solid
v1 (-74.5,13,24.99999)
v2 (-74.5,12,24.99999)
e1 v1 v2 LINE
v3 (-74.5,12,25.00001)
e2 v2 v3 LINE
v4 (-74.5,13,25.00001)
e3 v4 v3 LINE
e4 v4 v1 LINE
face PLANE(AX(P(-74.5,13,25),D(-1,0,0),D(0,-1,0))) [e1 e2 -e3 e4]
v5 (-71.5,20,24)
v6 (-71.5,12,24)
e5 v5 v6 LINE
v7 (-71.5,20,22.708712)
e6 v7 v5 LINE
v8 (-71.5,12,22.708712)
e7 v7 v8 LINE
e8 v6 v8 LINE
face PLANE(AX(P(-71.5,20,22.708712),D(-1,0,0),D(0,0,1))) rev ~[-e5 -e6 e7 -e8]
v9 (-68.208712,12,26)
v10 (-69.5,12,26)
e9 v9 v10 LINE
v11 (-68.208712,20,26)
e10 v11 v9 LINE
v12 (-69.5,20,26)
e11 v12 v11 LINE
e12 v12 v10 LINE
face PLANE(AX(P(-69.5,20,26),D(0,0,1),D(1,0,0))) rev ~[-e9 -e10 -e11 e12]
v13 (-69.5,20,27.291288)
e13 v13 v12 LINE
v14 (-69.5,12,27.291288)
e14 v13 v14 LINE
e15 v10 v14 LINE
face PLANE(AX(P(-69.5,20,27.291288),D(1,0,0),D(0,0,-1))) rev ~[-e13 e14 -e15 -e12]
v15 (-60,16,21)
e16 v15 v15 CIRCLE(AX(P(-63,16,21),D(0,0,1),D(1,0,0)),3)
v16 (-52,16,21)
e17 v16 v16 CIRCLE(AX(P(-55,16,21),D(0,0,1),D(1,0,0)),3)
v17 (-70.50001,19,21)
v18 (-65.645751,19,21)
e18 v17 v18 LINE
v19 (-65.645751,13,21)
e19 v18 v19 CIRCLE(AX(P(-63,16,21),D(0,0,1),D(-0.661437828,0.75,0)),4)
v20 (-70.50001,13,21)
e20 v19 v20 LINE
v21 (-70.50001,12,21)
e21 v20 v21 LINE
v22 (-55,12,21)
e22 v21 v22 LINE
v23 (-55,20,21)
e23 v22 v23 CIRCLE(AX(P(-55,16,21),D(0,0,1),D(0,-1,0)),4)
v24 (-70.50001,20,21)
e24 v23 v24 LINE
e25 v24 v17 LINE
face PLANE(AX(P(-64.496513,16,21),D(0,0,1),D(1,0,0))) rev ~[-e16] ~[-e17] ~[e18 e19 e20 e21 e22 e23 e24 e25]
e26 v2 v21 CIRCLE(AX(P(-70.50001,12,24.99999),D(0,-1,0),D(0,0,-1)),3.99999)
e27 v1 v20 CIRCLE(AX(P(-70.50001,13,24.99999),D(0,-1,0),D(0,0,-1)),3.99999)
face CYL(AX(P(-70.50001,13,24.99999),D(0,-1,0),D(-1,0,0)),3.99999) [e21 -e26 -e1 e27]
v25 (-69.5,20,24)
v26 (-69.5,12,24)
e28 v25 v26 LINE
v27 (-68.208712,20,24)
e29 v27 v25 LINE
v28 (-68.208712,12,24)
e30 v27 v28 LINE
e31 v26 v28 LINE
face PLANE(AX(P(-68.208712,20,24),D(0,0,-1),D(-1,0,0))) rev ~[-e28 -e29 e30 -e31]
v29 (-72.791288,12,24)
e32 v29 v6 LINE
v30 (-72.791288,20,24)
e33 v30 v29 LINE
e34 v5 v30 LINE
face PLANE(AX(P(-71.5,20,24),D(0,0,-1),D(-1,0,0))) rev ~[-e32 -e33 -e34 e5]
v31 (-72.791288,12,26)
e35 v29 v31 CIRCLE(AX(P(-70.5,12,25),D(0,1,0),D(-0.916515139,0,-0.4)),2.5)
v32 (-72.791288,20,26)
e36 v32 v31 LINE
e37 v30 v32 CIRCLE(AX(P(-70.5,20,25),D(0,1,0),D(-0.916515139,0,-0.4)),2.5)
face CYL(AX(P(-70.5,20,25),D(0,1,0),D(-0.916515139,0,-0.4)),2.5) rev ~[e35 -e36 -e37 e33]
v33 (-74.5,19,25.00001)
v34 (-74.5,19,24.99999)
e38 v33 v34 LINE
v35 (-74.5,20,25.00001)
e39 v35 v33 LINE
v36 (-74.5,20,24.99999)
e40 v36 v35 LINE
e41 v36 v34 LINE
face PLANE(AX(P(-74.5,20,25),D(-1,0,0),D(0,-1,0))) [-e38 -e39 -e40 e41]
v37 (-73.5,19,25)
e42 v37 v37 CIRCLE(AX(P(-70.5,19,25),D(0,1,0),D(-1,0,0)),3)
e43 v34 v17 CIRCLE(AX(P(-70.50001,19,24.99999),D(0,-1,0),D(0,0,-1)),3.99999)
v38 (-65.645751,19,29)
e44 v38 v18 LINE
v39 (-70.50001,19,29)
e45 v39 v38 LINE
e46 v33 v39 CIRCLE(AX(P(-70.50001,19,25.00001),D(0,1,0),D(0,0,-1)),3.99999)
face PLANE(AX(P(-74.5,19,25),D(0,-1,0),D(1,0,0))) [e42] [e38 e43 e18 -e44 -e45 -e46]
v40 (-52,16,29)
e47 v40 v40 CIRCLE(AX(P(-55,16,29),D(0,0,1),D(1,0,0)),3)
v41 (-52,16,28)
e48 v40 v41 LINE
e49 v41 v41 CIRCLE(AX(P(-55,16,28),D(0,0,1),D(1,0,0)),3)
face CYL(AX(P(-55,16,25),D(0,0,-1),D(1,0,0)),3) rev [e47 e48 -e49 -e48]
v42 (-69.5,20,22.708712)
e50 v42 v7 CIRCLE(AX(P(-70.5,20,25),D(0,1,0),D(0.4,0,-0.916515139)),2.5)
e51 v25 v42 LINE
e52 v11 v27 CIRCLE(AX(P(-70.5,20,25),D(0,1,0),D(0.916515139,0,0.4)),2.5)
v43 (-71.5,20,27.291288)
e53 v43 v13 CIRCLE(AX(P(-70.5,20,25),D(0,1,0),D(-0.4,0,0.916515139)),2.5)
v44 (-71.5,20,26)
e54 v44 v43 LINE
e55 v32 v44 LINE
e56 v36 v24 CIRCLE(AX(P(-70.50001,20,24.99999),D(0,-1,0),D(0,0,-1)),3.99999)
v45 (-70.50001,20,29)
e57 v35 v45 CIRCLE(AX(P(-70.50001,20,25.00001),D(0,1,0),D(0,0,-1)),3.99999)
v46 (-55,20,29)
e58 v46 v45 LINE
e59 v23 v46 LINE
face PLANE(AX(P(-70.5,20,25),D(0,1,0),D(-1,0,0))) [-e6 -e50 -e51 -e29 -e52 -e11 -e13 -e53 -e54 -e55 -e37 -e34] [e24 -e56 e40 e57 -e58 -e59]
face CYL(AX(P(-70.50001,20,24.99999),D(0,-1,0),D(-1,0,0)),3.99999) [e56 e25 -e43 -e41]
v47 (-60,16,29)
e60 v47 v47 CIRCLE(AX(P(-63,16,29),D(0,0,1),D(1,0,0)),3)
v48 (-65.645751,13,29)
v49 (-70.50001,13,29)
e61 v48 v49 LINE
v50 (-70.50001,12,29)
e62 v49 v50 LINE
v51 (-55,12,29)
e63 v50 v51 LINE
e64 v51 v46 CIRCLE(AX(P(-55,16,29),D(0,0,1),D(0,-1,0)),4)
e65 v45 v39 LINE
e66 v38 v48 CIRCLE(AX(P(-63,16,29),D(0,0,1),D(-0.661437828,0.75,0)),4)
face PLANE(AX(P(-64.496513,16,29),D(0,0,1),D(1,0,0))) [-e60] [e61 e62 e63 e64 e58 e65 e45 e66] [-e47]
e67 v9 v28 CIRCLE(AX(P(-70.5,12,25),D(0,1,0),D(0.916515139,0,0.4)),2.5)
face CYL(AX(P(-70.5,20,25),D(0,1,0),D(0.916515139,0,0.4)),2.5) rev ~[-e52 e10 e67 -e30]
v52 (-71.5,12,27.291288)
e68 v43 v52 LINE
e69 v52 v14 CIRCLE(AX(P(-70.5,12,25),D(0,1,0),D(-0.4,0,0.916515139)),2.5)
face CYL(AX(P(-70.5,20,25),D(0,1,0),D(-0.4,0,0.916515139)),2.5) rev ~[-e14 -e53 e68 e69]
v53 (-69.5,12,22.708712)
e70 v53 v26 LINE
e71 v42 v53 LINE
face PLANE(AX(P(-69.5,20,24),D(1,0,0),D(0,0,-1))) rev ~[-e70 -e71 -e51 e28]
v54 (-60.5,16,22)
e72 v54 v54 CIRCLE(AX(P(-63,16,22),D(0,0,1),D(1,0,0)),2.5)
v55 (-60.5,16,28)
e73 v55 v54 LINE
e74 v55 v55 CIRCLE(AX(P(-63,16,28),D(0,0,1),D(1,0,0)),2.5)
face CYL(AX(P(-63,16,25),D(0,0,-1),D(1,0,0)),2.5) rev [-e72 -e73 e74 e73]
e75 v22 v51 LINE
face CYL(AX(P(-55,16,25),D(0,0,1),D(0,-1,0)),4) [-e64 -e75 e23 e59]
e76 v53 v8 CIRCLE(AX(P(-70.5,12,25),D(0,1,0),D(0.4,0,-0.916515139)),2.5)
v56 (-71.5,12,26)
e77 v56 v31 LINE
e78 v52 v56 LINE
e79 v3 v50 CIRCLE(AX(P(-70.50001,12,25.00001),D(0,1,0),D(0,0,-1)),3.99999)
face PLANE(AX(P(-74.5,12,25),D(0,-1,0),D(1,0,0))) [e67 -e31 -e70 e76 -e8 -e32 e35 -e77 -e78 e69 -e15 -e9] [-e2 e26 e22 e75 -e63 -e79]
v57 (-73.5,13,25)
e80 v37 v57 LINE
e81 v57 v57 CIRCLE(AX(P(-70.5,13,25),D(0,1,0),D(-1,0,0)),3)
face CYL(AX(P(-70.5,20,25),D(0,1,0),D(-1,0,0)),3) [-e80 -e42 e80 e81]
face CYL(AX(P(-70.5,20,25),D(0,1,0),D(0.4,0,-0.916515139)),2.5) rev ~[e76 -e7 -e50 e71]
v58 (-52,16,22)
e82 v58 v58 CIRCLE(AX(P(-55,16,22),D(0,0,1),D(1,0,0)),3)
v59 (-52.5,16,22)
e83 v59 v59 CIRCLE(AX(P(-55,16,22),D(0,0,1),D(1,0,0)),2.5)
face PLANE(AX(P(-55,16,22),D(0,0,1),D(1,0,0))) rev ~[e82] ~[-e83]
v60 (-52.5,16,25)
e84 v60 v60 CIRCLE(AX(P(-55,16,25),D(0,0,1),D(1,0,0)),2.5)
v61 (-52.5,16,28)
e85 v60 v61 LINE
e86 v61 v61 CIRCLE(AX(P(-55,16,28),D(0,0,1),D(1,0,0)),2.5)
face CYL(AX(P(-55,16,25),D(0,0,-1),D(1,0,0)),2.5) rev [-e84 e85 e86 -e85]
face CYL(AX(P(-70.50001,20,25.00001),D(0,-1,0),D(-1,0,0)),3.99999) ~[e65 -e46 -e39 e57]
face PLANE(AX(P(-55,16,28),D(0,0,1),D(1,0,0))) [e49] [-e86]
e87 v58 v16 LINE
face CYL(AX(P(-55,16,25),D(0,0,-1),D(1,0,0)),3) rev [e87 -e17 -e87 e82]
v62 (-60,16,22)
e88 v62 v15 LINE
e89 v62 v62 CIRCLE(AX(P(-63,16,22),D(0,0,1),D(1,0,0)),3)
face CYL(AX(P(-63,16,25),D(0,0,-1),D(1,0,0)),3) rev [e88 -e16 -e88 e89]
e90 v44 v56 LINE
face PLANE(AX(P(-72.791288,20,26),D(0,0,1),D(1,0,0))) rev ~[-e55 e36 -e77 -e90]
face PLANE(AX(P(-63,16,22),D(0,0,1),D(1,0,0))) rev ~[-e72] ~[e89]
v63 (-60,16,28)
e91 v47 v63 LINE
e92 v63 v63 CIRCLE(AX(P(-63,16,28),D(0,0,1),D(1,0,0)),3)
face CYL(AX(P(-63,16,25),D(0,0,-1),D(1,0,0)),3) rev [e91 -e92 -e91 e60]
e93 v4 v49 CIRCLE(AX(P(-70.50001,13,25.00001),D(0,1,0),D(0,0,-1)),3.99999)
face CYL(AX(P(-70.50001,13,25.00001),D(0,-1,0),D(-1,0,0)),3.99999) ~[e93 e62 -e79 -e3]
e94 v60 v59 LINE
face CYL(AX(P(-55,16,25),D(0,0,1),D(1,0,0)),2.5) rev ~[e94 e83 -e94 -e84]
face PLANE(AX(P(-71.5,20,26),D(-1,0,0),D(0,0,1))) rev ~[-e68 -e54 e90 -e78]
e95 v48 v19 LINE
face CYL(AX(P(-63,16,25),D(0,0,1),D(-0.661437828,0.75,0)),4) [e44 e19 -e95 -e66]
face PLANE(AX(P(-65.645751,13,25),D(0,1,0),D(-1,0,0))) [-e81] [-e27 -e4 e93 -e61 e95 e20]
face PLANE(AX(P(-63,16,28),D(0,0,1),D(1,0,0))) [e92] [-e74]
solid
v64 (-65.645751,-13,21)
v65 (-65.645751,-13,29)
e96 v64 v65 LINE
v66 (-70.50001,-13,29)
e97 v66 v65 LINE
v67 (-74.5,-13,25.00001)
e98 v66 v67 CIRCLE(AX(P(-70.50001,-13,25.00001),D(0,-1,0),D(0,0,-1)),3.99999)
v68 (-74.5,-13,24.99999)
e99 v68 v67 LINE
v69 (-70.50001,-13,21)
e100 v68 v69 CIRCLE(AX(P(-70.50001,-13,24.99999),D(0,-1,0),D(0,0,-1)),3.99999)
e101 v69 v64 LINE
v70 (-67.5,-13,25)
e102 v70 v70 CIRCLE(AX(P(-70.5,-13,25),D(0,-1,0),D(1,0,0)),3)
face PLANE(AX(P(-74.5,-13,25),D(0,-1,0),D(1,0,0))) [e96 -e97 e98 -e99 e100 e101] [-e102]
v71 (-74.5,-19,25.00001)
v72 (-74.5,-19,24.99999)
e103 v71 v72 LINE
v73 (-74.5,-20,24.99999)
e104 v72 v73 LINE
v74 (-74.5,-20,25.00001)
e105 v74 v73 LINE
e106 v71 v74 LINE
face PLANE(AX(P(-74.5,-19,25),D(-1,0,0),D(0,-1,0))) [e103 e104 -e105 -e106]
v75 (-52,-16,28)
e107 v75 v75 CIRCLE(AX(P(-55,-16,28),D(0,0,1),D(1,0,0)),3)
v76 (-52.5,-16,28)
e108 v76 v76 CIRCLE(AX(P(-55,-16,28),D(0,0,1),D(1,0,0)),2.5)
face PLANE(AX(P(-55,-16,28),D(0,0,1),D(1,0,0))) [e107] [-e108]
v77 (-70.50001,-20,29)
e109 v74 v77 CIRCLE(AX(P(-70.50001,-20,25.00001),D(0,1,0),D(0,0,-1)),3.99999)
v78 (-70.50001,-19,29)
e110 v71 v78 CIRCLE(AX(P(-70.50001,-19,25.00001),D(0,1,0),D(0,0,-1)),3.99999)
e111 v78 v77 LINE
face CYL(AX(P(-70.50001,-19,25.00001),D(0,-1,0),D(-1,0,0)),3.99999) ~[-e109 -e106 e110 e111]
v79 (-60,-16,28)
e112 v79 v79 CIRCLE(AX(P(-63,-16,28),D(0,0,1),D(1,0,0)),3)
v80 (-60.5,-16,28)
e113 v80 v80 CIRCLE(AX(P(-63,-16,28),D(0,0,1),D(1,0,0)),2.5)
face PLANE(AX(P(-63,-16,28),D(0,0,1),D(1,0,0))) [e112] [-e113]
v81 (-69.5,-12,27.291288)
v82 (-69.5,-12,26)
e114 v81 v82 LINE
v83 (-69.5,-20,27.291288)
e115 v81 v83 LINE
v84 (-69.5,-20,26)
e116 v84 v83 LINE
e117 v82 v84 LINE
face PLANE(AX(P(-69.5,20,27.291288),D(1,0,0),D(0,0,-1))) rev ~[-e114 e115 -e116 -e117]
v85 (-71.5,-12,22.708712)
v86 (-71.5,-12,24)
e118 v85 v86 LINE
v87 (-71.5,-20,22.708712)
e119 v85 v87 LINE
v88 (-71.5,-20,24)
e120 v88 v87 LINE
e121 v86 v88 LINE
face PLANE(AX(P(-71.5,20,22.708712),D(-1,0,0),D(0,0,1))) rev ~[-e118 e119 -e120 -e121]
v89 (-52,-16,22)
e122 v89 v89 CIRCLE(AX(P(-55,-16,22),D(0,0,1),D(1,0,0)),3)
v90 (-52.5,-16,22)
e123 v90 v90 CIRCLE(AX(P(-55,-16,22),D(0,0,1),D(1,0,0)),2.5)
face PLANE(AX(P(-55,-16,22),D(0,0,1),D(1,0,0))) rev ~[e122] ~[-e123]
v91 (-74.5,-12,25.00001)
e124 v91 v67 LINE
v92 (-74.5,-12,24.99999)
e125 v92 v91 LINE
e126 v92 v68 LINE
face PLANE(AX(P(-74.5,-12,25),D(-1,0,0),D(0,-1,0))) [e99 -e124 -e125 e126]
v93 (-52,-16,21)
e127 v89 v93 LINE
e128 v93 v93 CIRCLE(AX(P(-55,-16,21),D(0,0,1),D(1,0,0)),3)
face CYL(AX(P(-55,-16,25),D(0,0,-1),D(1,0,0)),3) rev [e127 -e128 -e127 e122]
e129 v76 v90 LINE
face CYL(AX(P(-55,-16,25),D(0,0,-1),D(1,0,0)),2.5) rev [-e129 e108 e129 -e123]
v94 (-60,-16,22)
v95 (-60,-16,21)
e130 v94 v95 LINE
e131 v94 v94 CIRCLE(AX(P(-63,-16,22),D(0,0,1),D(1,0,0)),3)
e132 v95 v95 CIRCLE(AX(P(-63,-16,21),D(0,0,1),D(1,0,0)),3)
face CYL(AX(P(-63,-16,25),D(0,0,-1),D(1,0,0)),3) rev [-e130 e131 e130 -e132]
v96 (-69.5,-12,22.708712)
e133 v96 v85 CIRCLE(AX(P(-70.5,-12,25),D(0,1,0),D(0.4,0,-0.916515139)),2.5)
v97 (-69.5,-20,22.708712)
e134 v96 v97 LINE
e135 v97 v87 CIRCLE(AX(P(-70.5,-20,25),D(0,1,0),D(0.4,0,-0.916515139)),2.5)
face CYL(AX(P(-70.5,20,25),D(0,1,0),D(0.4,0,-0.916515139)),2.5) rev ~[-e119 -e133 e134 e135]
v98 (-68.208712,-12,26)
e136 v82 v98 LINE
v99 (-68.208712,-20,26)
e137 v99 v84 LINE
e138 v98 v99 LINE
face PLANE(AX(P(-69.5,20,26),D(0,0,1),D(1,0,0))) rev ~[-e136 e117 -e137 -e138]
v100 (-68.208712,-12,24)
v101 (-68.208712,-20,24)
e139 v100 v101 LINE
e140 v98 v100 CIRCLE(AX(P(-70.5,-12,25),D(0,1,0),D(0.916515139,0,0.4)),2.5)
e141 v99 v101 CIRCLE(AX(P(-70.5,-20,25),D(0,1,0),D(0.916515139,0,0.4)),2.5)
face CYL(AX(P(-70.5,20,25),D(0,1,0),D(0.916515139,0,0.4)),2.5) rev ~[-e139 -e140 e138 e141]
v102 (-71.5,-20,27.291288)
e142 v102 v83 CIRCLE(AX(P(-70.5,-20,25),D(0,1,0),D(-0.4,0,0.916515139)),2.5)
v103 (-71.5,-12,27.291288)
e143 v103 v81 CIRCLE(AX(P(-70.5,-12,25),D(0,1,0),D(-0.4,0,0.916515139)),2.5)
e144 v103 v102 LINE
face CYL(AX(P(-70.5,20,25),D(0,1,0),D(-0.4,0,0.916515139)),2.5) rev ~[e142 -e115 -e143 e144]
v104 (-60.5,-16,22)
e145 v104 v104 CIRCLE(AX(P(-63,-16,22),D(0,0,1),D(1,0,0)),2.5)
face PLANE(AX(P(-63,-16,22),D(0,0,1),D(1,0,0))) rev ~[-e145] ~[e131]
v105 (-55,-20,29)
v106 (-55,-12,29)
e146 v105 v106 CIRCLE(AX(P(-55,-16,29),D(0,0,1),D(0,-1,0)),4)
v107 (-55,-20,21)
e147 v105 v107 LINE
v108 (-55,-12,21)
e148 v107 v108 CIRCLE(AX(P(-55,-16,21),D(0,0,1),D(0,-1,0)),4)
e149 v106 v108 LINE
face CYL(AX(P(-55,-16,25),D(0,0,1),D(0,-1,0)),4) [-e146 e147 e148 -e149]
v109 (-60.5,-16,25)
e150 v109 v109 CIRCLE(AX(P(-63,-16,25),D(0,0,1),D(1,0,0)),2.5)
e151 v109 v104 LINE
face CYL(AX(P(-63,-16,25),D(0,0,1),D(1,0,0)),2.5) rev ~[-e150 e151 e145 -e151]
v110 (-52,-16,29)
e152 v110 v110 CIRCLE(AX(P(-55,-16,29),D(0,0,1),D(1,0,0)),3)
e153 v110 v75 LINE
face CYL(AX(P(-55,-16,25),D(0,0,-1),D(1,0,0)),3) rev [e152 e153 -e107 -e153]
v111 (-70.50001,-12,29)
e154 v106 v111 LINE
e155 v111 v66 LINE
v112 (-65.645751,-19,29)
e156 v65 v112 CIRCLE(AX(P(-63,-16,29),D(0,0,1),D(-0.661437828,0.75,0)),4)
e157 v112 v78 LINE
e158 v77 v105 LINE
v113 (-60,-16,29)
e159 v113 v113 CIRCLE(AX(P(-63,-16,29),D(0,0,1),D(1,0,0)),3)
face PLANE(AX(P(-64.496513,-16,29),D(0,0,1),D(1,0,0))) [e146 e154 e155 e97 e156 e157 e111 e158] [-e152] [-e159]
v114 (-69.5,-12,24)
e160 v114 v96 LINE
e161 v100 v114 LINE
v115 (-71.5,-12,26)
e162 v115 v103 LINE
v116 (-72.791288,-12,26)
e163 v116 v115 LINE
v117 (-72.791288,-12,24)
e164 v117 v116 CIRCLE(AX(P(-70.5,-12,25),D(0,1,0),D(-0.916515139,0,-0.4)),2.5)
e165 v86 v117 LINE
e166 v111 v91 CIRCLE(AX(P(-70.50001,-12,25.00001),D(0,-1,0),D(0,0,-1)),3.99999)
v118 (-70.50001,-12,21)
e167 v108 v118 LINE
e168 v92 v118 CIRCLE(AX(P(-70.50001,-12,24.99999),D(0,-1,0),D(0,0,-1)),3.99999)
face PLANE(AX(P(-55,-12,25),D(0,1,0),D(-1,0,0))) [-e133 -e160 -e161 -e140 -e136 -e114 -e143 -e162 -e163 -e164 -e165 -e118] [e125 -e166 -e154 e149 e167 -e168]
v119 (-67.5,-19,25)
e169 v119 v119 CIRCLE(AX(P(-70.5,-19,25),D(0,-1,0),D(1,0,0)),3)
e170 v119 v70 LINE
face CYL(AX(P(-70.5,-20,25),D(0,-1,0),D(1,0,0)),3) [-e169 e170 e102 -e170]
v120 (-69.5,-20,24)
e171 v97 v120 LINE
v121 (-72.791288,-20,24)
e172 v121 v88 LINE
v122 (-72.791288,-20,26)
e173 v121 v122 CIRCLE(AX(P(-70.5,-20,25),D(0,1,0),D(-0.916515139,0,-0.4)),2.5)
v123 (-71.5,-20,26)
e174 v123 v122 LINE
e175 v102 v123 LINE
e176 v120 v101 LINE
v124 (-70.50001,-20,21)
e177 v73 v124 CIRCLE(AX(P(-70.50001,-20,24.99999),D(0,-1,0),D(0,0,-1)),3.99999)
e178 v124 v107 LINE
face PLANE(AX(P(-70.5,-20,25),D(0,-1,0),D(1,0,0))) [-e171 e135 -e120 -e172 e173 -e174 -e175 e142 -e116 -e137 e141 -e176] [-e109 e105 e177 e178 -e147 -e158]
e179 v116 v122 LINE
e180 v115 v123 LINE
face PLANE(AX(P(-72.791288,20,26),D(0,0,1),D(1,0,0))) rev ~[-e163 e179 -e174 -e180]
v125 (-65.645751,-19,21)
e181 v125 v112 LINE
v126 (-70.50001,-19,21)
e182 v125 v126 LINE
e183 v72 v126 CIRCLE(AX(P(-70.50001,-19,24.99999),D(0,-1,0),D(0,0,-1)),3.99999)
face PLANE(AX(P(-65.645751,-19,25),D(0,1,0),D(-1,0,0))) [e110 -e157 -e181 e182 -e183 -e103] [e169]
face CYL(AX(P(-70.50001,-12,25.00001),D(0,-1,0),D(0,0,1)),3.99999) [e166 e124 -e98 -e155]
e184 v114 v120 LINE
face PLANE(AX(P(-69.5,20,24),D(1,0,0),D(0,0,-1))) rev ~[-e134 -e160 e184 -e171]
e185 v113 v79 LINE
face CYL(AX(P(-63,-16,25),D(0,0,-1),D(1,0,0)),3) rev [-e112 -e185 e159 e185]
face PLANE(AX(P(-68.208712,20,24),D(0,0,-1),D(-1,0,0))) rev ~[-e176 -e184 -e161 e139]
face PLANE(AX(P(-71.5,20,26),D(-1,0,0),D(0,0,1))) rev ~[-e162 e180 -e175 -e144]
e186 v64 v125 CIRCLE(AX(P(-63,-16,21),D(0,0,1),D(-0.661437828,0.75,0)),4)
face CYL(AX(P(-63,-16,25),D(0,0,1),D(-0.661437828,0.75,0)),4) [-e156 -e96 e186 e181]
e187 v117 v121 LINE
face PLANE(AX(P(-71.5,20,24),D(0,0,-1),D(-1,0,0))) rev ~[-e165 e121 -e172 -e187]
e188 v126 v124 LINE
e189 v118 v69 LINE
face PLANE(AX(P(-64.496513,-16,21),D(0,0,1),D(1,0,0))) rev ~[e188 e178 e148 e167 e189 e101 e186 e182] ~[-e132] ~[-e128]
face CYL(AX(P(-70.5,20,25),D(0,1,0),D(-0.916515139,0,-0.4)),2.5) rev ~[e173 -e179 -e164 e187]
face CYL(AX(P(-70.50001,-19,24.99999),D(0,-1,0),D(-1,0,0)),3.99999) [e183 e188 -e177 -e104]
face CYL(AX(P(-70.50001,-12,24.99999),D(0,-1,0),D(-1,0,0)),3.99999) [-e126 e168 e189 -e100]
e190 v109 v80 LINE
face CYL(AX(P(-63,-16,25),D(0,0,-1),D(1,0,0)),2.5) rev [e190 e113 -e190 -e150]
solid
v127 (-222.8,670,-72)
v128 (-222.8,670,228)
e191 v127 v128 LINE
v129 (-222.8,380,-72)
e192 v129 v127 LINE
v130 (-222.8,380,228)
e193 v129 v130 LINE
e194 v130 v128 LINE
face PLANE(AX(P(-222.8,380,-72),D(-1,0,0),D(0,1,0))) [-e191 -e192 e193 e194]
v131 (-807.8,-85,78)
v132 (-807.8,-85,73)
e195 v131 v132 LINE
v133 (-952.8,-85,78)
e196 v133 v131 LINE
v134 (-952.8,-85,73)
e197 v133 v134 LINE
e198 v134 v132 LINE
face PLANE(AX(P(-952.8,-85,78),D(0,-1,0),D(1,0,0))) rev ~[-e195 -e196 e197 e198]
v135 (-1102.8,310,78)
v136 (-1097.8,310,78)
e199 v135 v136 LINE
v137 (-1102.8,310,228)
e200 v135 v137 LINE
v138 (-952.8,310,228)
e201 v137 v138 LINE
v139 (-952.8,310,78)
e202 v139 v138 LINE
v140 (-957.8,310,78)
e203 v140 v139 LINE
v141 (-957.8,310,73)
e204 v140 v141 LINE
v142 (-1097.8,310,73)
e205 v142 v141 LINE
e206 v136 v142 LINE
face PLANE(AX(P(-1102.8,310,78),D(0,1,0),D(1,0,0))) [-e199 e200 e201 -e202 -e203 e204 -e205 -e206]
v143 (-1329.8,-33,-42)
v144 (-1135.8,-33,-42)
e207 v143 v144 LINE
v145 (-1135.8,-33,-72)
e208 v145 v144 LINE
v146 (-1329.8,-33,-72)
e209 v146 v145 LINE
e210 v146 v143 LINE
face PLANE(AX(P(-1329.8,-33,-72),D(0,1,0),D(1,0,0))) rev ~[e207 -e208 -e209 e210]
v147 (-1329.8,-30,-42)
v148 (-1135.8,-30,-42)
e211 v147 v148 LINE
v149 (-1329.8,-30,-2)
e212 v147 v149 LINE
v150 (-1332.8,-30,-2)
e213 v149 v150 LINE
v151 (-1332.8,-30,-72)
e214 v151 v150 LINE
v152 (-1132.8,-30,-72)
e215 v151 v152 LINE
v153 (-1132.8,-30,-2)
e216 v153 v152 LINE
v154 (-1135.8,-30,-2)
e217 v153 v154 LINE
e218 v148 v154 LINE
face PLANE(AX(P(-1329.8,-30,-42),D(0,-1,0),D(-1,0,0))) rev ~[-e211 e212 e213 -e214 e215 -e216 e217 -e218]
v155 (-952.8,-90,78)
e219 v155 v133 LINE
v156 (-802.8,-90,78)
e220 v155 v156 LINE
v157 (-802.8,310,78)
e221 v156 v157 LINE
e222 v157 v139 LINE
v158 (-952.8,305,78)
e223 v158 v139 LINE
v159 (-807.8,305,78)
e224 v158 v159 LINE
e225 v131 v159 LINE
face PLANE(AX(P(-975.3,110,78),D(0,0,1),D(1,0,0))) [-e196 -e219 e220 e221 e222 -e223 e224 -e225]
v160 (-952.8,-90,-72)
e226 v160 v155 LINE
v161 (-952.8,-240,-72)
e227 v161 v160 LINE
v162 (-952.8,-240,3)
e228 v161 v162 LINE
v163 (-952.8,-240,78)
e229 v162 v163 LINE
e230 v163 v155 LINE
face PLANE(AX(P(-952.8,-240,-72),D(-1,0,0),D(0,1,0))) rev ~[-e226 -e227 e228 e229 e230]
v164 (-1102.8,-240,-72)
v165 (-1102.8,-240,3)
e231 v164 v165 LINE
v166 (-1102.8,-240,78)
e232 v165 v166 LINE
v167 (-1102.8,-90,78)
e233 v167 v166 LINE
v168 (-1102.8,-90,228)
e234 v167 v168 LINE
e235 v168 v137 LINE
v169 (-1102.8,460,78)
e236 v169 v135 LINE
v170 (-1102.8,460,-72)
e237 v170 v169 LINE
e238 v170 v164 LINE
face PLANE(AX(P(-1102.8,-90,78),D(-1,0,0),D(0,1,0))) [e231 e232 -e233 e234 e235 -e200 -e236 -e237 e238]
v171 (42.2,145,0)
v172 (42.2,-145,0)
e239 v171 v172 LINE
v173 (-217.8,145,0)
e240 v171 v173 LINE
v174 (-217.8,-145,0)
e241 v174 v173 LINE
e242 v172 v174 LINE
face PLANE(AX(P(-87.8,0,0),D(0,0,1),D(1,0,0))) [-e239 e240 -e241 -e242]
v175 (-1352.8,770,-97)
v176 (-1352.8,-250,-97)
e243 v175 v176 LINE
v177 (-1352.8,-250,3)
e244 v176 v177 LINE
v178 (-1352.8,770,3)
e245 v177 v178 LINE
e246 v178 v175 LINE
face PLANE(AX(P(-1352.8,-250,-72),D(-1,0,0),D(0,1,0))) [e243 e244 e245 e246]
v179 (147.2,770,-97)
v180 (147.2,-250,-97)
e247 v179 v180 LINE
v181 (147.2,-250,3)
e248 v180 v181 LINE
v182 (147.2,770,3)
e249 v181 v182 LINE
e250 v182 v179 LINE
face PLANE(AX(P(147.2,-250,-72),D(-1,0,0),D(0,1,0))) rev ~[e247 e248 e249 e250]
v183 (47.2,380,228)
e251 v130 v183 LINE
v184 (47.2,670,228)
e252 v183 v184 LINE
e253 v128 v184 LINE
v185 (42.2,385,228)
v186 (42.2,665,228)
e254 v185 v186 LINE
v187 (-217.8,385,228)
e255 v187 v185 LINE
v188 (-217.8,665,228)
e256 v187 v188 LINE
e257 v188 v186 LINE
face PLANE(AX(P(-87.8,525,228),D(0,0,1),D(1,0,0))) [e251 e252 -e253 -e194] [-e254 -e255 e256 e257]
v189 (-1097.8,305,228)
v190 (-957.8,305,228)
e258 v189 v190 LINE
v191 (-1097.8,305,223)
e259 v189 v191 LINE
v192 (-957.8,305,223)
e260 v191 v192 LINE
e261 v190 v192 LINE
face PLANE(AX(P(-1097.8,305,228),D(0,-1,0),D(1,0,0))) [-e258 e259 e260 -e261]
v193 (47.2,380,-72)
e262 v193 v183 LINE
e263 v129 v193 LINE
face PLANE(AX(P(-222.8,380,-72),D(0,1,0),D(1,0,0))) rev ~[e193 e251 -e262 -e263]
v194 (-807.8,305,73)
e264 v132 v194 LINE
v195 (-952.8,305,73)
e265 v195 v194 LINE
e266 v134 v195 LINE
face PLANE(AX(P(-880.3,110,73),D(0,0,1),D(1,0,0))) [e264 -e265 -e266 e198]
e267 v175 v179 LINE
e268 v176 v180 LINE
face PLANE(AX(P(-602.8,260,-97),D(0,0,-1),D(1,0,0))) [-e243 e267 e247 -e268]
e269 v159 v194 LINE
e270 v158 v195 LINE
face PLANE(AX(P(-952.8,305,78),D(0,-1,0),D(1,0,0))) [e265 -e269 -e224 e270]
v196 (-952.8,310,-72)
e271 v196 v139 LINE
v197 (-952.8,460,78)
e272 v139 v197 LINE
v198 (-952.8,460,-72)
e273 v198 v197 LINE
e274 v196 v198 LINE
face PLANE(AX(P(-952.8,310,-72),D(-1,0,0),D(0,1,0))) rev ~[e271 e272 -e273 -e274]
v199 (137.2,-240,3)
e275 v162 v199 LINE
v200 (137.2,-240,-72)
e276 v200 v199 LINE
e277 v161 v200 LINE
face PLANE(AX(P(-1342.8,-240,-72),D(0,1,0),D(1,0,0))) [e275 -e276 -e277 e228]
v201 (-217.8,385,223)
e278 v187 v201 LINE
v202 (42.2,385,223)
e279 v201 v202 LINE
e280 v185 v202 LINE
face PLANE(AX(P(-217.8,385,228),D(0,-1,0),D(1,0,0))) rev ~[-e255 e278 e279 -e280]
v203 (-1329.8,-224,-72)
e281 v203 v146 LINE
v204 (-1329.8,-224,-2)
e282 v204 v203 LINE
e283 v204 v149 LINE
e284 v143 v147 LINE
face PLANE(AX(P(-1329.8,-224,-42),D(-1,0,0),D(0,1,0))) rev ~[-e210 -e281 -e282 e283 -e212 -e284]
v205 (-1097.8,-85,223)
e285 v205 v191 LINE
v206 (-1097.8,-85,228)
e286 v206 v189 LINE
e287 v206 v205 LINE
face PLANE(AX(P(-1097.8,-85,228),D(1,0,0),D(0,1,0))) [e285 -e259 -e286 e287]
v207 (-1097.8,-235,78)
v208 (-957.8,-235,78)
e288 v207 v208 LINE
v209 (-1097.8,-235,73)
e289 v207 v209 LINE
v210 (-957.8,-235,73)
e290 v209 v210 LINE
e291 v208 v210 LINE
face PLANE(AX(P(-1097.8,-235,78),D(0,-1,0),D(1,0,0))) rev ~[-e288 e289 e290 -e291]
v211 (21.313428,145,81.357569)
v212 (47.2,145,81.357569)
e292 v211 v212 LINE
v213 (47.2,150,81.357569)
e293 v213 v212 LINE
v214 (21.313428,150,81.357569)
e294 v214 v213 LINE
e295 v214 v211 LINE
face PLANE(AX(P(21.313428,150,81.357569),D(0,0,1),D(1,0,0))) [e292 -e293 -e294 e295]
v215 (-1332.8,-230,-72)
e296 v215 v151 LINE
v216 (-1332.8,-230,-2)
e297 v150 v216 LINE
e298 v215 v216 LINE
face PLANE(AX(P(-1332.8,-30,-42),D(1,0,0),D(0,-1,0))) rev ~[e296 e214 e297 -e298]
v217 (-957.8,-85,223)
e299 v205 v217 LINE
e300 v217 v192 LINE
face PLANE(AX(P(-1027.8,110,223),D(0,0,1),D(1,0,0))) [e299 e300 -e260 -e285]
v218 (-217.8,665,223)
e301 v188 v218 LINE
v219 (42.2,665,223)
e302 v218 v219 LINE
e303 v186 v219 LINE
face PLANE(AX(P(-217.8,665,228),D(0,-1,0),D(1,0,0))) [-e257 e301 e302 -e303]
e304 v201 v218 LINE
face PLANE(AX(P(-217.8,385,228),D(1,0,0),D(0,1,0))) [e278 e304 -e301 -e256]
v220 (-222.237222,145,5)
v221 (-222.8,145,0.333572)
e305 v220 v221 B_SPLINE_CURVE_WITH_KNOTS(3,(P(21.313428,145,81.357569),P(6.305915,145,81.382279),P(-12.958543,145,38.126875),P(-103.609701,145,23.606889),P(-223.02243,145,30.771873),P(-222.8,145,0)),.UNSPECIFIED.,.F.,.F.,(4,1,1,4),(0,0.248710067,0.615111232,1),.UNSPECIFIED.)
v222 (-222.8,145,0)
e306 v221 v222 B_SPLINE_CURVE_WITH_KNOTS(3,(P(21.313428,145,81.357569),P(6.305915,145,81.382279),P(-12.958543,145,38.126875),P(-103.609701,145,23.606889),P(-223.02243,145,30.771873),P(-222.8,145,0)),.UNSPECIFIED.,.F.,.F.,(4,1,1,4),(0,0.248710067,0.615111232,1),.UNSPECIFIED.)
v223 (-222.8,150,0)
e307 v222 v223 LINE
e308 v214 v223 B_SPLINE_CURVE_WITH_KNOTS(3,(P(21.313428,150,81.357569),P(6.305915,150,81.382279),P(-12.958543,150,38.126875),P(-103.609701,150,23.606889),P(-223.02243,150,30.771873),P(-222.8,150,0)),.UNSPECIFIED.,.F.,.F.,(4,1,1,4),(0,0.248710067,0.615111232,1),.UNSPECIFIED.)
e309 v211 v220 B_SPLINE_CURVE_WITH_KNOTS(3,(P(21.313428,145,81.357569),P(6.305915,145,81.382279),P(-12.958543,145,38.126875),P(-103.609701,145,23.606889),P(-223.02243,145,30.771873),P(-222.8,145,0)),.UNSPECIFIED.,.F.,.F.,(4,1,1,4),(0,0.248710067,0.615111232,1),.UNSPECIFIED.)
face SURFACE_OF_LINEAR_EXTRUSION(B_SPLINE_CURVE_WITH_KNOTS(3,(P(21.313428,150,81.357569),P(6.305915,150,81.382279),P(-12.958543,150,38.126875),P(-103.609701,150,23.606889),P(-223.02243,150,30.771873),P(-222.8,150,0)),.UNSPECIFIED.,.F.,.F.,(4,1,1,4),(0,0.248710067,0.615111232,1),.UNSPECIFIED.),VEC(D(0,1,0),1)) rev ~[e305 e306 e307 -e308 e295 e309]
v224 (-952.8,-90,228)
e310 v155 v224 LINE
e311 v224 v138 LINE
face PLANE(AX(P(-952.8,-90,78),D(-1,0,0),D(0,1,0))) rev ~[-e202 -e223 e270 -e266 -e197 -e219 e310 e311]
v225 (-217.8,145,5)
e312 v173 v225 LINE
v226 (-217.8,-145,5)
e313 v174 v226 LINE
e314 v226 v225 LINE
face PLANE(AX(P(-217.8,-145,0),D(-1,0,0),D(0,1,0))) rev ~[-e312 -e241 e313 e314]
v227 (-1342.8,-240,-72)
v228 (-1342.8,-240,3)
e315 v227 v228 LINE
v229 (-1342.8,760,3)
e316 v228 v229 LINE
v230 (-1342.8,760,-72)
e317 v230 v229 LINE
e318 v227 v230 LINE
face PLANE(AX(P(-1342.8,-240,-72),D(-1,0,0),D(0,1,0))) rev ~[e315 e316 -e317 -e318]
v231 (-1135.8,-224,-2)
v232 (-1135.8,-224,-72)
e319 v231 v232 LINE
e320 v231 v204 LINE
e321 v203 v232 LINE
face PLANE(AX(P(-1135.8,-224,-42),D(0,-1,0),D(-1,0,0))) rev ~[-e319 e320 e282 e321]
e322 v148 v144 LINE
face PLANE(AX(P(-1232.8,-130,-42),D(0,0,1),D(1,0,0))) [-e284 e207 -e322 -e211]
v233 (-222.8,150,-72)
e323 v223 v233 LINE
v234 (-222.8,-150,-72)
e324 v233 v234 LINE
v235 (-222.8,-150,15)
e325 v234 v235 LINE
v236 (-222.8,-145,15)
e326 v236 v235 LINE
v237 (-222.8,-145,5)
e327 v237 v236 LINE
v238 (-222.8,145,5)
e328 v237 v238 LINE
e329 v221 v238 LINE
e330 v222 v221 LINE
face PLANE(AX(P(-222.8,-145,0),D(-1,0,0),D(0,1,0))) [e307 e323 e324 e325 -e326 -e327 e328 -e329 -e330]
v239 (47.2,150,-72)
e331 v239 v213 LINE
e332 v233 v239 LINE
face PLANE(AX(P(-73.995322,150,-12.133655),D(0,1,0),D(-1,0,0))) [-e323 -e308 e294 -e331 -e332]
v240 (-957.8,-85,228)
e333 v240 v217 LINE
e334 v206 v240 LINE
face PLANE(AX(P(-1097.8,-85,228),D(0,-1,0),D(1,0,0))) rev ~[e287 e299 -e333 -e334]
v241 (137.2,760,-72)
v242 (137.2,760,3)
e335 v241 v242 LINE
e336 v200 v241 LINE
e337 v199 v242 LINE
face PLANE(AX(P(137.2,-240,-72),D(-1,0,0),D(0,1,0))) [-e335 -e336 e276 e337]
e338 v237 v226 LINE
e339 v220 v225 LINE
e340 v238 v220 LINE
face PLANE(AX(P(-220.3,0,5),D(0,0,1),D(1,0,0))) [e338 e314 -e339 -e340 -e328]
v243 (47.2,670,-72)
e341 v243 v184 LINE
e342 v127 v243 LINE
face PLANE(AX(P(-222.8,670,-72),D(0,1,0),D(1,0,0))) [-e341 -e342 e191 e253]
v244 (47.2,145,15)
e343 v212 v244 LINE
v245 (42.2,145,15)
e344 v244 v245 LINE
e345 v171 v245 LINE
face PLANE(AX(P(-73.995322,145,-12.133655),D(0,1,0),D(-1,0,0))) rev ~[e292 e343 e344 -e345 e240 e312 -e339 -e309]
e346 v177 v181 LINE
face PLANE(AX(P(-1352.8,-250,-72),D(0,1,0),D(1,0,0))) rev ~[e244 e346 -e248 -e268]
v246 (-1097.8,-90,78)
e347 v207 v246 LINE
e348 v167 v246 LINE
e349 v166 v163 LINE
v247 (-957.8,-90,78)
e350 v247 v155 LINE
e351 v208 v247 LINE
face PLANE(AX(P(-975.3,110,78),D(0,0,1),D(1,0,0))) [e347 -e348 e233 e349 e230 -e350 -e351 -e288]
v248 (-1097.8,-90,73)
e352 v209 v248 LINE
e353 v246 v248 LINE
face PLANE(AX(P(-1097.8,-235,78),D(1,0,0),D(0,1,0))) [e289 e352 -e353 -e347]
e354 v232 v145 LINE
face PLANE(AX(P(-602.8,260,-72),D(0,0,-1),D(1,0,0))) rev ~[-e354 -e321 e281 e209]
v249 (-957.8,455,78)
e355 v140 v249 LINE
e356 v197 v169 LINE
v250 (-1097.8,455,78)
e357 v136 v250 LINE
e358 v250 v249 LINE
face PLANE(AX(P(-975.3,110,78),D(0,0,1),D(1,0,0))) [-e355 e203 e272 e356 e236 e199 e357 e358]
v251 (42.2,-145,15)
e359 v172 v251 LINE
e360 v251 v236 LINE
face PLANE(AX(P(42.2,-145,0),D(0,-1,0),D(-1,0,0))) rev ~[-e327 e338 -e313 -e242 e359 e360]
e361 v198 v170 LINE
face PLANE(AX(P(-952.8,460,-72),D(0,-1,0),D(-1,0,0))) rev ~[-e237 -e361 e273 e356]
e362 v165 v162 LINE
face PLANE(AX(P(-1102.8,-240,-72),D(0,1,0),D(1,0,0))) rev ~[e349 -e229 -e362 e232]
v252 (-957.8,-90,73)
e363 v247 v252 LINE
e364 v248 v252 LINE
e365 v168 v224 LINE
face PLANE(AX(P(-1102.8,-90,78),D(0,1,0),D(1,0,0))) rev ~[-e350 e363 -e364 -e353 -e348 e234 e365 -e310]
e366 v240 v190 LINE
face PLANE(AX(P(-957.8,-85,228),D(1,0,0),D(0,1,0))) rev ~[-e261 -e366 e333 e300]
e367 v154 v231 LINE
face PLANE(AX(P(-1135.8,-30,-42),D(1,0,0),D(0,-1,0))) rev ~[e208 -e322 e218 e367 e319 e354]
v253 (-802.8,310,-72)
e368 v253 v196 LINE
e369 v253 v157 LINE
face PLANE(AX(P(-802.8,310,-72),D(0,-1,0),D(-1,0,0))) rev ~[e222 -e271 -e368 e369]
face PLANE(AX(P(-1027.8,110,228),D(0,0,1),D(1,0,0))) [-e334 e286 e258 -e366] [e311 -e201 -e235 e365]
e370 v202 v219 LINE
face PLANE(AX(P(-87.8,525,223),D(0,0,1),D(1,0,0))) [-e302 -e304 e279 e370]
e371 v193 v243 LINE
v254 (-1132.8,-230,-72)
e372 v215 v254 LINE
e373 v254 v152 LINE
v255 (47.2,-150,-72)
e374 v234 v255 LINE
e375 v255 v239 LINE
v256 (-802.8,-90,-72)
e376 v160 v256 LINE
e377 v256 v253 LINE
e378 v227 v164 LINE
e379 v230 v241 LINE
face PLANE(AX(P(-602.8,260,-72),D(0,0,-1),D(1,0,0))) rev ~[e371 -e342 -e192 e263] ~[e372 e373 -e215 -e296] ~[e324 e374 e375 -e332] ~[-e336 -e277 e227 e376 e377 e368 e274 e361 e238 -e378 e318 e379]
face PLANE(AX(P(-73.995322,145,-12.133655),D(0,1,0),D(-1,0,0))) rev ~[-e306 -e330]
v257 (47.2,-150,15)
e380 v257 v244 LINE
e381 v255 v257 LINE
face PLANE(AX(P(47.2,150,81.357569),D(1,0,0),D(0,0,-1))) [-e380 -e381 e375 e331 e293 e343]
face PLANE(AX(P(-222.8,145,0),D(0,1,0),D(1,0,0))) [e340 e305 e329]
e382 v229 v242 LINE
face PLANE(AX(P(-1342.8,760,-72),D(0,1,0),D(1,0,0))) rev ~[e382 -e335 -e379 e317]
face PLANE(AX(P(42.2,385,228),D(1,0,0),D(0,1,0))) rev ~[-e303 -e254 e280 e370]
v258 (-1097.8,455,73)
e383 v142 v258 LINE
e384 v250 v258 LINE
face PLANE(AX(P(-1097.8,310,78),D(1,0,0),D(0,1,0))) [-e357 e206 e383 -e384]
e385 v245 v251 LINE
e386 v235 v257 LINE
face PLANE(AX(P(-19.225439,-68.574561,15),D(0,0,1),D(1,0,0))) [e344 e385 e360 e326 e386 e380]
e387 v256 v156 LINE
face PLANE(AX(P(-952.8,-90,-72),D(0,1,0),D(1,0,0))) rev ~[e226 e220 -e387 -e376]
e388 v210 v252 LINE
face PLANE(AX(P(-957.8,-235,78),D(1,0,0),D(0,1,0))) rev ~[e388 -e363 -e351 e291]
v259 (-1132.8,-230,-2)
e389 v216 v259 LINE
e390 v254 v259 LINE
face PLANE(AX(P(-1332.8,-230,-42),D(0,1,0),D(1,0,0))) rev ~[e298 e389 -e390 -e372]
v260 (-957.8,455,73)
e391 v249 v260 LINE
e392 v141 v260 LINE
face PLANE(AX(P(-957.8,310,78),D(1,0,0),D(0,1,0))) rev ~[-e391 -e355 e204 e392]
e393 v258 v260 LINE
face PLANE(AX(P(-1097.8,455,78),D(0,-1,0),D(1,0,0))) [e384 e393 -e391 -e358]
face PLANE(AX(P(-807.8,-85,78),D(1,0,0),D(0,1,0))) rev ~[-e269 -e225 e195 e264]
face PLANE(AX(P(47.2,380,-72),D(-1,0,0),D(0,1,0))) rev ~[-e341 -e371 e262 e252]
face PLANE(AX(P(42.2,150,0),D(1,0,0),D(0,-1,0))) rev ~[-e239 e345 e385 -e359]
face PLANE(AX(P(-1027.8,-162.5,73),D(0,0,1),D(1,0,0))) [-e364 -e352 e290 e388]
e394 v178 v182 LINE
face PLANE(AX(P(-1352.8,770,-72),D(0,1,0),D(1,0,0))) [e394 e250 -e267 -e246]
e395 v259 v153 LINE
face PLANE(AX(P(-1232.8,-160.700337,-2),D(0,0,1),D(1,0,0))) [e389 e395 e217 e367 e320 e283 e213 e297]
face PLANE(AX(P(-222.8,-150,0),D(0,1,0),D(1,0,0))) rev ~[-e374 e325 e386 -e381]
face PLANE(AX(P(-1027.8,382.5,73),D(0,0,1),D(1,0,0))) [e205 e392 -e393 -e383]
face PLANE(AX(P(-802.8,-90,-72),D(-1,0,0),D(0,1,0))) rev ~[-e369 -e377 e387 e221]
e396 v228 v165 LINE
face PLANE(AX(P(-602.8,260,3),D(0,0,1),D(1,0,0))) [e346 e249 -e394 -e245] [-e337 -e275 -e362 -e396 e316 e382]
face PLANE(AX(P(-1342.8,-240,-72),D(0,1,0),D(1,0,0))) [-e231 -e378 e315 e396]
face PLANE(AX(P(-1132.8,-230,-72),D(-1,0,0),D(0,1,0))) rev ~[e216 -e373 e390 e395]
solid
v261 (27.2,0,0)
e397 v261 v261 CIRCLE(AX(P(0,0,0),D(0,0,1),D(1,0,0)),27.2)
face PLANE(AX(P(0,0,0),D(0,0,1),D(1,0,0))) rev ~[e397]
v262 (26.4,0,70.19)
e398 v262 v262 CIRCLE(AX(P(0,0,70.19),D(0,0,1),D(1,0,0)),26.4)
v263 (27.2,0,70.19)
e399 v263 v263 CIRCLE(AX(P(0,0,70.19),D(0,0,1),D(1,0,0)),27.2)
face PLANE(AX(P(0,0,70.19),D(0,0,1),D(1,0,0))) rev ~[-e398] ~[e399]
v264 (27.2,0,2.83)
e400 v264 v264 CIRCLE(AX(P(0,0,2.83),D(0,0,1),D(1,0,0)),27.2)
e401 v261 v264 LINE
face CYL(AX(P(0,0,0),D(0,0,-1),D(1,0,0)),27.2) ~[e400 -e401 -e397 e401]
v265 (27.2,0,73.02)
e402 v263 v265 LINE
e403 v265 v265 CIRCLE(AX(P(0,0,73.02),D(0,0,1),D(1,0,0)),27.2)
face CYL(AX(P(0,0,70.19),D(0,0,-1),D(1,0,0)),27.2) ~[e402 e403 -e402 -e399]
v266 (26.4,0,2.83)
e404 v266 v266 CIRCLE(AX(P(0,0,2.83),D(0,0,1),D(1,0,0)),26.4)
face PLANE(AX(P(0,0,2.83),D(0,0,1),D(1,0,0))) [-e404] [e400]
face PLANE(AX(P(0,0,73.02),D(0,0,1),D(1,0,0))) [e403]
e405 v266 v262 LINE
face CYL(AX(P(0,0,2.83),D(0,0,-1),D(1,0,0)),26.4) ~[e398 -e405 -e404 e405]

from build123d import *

# Parameters (mm, degrees)
F0_R      = 27.2
F1_DEPTH  = 2.83
F2_R      = 26.4
F3_DEPTH  = 67.36
F4_R      = 27.2
F5_DEPTH  = 2.83
F9_W      = 270
F9_H      = 300
F10_DEPTH = 72
F12_DEPTH = 15
F14_DEPTH = 5
F15_W     = 5
F15_H     = 290
F16_DEPTH = 5
F17_W     = 1500
F17_H     = 1020
F18_DEPTH = 25
F19_W     = 270
F19_H     = 290
F20_DEPTH = 300
F21_W     = 260
F21_H     = 280
F22_DEPTH = 5
F23_W     = 1500
F23_H     = 1020
F23_W_2   = 1480
F23_H_2   = 1000
F24_DEPTH = 75
F26_DEPTH = 150
F27_W     = 150
F27_H     = 400
F28_DEPTH = 150
F29_W     = 140
F29_H     = 390
F30_DEPTH = 5
F31_W     = 140
F31_H     = 145
F31_W_2   = 145
F31_H_2   = 390
F32_DEPTH = 5
F33_R     = 3
F34_DEPTH = 4
F35_R     = 3.99999
F35_2_R   = 3.99999
F36_R     = 3
F37_DEPTH = 8
F38_R     = 3
F39_DEPTH = 8
F40_R     = 3
F40_R_2   = 2.5
F41_DEPTH = 3
F42_R     = 3
F42_R_2   = 2.5
F43_DEPTH = 3
F45_DEPTH = 270.001
F46_W     = 200
F46_H     = 200
F46_W_2   = 194
F46_H_2   = 191
F47_DEPTH = 30
F49_DEPTH = 40
F50_R     = 2.5
F51_DEPTH = 8


# Not quite as in the source:
# - a fillet or chamfer is up to 0.001 mm smaller than in the source, because OpenCascade refuses the exact size
# - a feature names something its author has since deleted; it is built from what else it names


with BuildPart() as f1:
    # F0 (on Top) → F1 (new body)
    with BuildSketch(Plane.XY):
        Circle(F0_R)
    extrude(amount=F1_DEPTH)

    # F2 (on face) → F3 (join)
    with BuildSketch(Plane.XY.offset(2.83)):
        Circle(F2_R)
    extrude(amount=F3_DEPTH)

    # F4 (on face) → F5 (join)
    with BuildSketch(Plane.XY.offset(70.19)):
        Circle(F4_R)
    extrude(amount=F5_DEPTH)


with BuildPart() as f10:
    # F9 (on Top) → F10 (new body)
    with BuildSketch(Plane.XY):
        with Locations((-87.8, 0)):
            Rectangle(F9_W, F9_H)
    extrude(amount=-F10_DEPTH)

    # F11 (on face) → F12 (join)
    with BuildSketch(Plane.XY):
        Polygon((-222.8, -145), (-222.8, -150), (47.2, -150), (47.2, 150), (42.2, 150), (42.2, -145), align=None)
    extrude(amount=F12_DEPTH)

    # F13 (on face) → F14 (join)
    with BuildSketch(Plane(origin=(0, 150, 0), x_dir=(-1, 0, 0), z_dir=(0, 1, 0))):
        with BuildLine():
            Line((-21.3134280931, 81.3575685024), (-47.2, 81.3575685024))
            Line((-47.2, 81.3575685024), (-47.2, -72))
            Line((-47.2, -72), (222.8, -72))
            Line((222.8, -72), (222.8, 0))
            add(Edge.make_bspline(
                [(-21.3134280931, 81.3575685024), (-6.3059147253, 81.3822787863), (12.9585432644, 38.1268753575), (103.6097013063, 23.6068887567), (223.0224295336, 30.7718731823), (222.8, 0)],
                knots=[0, 0, 0, 0, 0.2487100673, 0.6151112321, 1, 1, 1, 1], degree=3))
        make_face()
    extrude(amount=-F14_DEPTH)

    # F15 (on face) → F16 (join)
    with BuildSketch(Plane.XY):
        with Locations((-220.3, 0)):
            Rectangle(F15_W, F15_H)
    extrude(amount=F16_DEPTH)

    # F17 (on face) → F18 (join)
    with BuildSketch(Plane(origin=(0, 0, -72), x_dir=(1, 0, 0), z_dir=(0, 0, -1))):
        with Locations((-602.8, -260)):
            Rectangle(F17_W, F17_H)
    extrude(amount=F18_DEPTH)

    # F19 (on face) → F20 (join)
    with BuildSketch(Plane.XY.offset(-72)):
        with Locations((-87.8, 525)):
            Rectangle(F19_W, F19_H)
    extrude(amount=F20_DEPTH)

    # F21 (on face) → F22 (cut)
    with BuildSketch(Plane.XY.offset(228)):
        with Locations((-87.8, 525)):
            Rectangle(F21_W, F21_H)
    extrude(amount=-F22_DEPTH, mode=Mode.SUBTRACT)

    # F23 (on face) → F24 (join)
    with BuildSketch(Plane.XY.offset(-72)):
        with Locations((-602.8, 260)):
            Rectangle(F23_W, F23_H)
        with Locations((-602.8, 260)):
            Rectangle(F23_W_2, F23_H_2, mode=Mode.SUBTRACT)
    extrude(amount=F24_DEPTH)

    # F25 (on face) → F26 (join)
    with BuildSketch(Plane.XY.offset(-72)):
        Polygon((-952.8, 460), (-1102.8, 460), (-1102.8, -240), (-952.8, -240), (-952.8, -90), (-802.8, -90), (-802.8, 310), (-952.8, 310), align=None)
    extrude(amount=F26_DEPTH)

    # F27 (on face) → F28 (join)
    with BuildSketch(Plane.XY.offset(78)):
        with Locations((-1027.8, 110)):
            Rectangle(F27_W, F27_H)
    extrude(amount=F28_DEPTH)

    # F29 (on face) → F30 (cut)
    with BuildSketch(Plane.XY.offset(228)):
        with Locations((-1027.8, 110)):
            Rectangle(F29_W, F29_H)
    extrude(amount=-F30_DEPTH, mode=Mode.SUBTRACT)

    # F31 (on face) → F32 (cut)
    with BuildSketch(Plane.XY.offset(78)):
        with Locations((-1027.8, 382.5)):
            Rectangle(F31_W, F31_H)
        with Locations((-880.3, 110)):
            Rectangle(F31_W_2, F31_H_2)
        with Locations((-1027.8, -162.5)):
            Rectangle(F31_W, F31_H)
    extrude(amount=-F32_DEPTH, mode=Mode.SUBTRACT)

    # F46 (on face) → F47 (join)
    with BuildSketch(Plane.XY.offset(-72)):
        with Locations((-1232.8, -130)):
            Rectangle(F46_W, F46_H)
        with Locations((-1232.8, -128.5)):
            Rectangle(F46_W_2, F46_H_2, mode=Mode.SUBTRACT)
    extrude(amount=F47_DEPTH)

    # F48 (on face) → F49 (join)
    with BuildSketch(Plane.XY.offset(-42)):
        Polygon((-1329.8, -30), (-1332.8, -30), (-1332.8, -230), (-1329.8, -230), (-1135.8, -230), (-1132.8, -230), (-1132.8, -30), (-1135.8, -30), (-1135.8, -224), (-1329.8, -224), align=None)
    extrude(amount=F49_DEPTH)


with BuildPart() as f34:
    # F33 (on offset) → F34 (new body, symmetric)
    with BuildSketch(Plane.XY.offset(25)):
        with BuildLine():
            Line((-55, -12), (-74.5, -12))
            Line((-74.5, -12), (-74.5, -13))
            Line((-74.5, -13), (-65.6457513111, -13))
            ThreePointArc((-65.6457513111, -13), (-67, -16), (-65.6457513111, -19))
            Line((-65.6457513111, -19), (-74.5, -19))
            Line((-74.5, -19), (-74.5, -20))
            Line((-74.5, -20), (-55, -20))
            ThreePointArc((-55, -20), (-51, -16), (-55, -12))
        make_face()
        with Locations((-63, -16)):
            Circle(F33_R, mode=Mode.SUBTRACT)
        with Locations((-55, -16)):
            Circle(F33_R, mode=Mode.SUBTRACT)
    extrude(amount=F34_DEPTH, both=True)

    # F35 (radius 4 in the source; OpenCascade refuses exactly that, so slightly less here)
    f35_edges = [f34.edges().sort_by_distance(p)[0] for p in [
        (-74.5, -19.5, 29),
        (-74.5, -12.5, 29),
        (-74.5, -19.5, 21),
        (-74.5, -12.5, 21),
    ]]
    fillet(f35_edges, radius=F35_R)

    # F36 (on face) → F37 (join, through all)
    with BuildSketch(Plane.XZ.offset(20)):
        with Locations((-70.5, 25)):
            Circle(F36_R)
    extrude(amount=-F37_DEPTH)

    # F42 (on offset) → F43 (join, symmetric)
    with BuildSketch(Plane.XY.offset(25)):
        with Locations((-63, -16)):
            Circle(F42_R)
        with Locations((-63, -16)):
            Circle(F42_R_2, mode=Mode.SUBTRACT)
        with Locations((-55, -16)):
            Circle(F42_R)
        with Locations((-55, -16)):
            Circle(F42_R_2, mode=Mode.SUBTRACT)
    extrude(amount=F43_DEPTH, both=True)


with BuildPart() as f34b:
    # F33 (on offset) → F34, piece 2 (new body, symmetric)
    with BuildSketch(Plane.XY.offset(25)):
        with BuildLine():
            Line((-74.5, 13), (-74.5, 12))
            Line((-74.5, 12), (-55, 12))
            ThreePointArc((-55, 12), (-51, 16), (-55, 20))
            Line((-55, 20), (-74.5, 20))
            Line((-74.5, 20), (-74.5, 19))
            Line((-74.5, 19), (-65.6457513111, 19))
            ThreePointArc((-65.6457513111, 19), (-67, 16), (-65.6457513111, 13))
            Line((-65.6457513111, 13), (-74.5, 13))
        make_face()
        with Locations((-63, 16)):
            Circle(F33_R, mode=Mode.SUBTRACT)
        with Locations((-55, 16)):
            Circle(F33_R, mode=Mode.SUBTRACT)
    extrude(amount=F34_DEPTH, both=True)

    # F35#2 (radius 4 in the source; OpenCascade refuses exactly that, so slightly less here)
    f35_2_edges = [f34b.edges().sort_by_distance(p)[0] for p in [
        (-74.5, 12.5, 29),
        (-74.5, 19.5, 29),
        (-74.5, 19.5, 21),
        (-74.5, 12.5, 21),
    ]]
    fillet(f35_2_edges, radius=F35_2_R)

    # F38 (on face) → F39 (join, through all)
    with BuildSketch(Plane(origin=(0, 20, 0), x_dir=(-1, 0, 0), z_dir=(0, 1, 0))):
        with Locations((70.5, 25)):
            Circle(F38_R)
    extrude(amount=-F39_DEPTH)

    # F40 (on offset) → F41 (join, symmetric)
    with BuildSketch(Plane.XY.offset(25)):
        with Locations((-55, 16)):
            Circle(F40_R)
        with Locations((-55, 16)):
            Circle(F40_R_2, mode=Mode.SUBTRACT)
        with Locations((-63, 16)):
            Circle(F40_R)
        with Locations((-63, 16)):
            Circle(F40_R_2, mode=Mode.SUBTRACT)
    extrude(amount=F41_DEPTH, both=True)


with BuildPart() as f45_tool:
    # F44 (on face) → F45 (new body, through all)
    with BuildSketch(Plane(origin=(0, 20, 0), x_dir=(-1, 0, 0), z_dir=(0, 1, 0))):
        with BuildLine():
            Line((71.5, 26), (71.5, 27.2912878475))
            ThreePointArc((71.5, 27.2912878475), (70.5, 27.5), (69.5, 27.2912878475))
            Line((69.5, 27.2912878475), (69.5, 26))
            Line((69.5, 26), (68.2087121525, 26))
            ThreePointArc((68.2087121525, 26), (68, 25), (68.2087121525, 24))
            Line((68.2087121525, 24), (69.5, 24))
            Line((69.5, 24), (69.5, 22.7087121525))
            ThreePointArc((69.5, 22.7087121525), (70.5, 22.5), (71.5, 22.7087121525))
            Line((71.5, 22.7087121525), (71.5, 24))
            Line((71.5, 24), (72.7912878475, 24))
            ThreePointArc((72.7912878475, 24), (73, 25), (72.7912878475, 26))
            Line((72.7912878475, 26), (71.5, 26))
        make_face()
    extrude(amount=-F45_DEPTH)


with BuildPart() as f34_1:
    add(f34.part)

    # F45: cut by f45_tool
    add(f45_tool.part, mode=Mode.SUBTRACT)


with BuildPart() as f34b_1:
    add(f34b.part)

    # F45: cut by f45_tool
    add(f45_tool.part, mode=Mode.SUBTRACT)


with BuildPart() as f51:
    # F50 (on face) → F51 (new body)
    with BuildSketch(Plane.XY.offset(29)):
        Polygon((-0.619225204, 27.0833074003), (-78.9677798748, 27.0833074003), (-78.9677798748, 12), (-44.8230803013, 12), (-44.8230803013, -8.2436139807), (-78.9677798748, -8.2436139807), (-78.9677798748, -29.8999884278), (-0.619225204, -29.8999884278), align=None)
        with Locations((-63, 16)):
            Circle(F50_R, mode=Mode.SUBTRACT)
    extrude(amount=F51_DEPTH)


solid = Compound([f1.part, f10.part, f34_1.part, f34b_1.part])
